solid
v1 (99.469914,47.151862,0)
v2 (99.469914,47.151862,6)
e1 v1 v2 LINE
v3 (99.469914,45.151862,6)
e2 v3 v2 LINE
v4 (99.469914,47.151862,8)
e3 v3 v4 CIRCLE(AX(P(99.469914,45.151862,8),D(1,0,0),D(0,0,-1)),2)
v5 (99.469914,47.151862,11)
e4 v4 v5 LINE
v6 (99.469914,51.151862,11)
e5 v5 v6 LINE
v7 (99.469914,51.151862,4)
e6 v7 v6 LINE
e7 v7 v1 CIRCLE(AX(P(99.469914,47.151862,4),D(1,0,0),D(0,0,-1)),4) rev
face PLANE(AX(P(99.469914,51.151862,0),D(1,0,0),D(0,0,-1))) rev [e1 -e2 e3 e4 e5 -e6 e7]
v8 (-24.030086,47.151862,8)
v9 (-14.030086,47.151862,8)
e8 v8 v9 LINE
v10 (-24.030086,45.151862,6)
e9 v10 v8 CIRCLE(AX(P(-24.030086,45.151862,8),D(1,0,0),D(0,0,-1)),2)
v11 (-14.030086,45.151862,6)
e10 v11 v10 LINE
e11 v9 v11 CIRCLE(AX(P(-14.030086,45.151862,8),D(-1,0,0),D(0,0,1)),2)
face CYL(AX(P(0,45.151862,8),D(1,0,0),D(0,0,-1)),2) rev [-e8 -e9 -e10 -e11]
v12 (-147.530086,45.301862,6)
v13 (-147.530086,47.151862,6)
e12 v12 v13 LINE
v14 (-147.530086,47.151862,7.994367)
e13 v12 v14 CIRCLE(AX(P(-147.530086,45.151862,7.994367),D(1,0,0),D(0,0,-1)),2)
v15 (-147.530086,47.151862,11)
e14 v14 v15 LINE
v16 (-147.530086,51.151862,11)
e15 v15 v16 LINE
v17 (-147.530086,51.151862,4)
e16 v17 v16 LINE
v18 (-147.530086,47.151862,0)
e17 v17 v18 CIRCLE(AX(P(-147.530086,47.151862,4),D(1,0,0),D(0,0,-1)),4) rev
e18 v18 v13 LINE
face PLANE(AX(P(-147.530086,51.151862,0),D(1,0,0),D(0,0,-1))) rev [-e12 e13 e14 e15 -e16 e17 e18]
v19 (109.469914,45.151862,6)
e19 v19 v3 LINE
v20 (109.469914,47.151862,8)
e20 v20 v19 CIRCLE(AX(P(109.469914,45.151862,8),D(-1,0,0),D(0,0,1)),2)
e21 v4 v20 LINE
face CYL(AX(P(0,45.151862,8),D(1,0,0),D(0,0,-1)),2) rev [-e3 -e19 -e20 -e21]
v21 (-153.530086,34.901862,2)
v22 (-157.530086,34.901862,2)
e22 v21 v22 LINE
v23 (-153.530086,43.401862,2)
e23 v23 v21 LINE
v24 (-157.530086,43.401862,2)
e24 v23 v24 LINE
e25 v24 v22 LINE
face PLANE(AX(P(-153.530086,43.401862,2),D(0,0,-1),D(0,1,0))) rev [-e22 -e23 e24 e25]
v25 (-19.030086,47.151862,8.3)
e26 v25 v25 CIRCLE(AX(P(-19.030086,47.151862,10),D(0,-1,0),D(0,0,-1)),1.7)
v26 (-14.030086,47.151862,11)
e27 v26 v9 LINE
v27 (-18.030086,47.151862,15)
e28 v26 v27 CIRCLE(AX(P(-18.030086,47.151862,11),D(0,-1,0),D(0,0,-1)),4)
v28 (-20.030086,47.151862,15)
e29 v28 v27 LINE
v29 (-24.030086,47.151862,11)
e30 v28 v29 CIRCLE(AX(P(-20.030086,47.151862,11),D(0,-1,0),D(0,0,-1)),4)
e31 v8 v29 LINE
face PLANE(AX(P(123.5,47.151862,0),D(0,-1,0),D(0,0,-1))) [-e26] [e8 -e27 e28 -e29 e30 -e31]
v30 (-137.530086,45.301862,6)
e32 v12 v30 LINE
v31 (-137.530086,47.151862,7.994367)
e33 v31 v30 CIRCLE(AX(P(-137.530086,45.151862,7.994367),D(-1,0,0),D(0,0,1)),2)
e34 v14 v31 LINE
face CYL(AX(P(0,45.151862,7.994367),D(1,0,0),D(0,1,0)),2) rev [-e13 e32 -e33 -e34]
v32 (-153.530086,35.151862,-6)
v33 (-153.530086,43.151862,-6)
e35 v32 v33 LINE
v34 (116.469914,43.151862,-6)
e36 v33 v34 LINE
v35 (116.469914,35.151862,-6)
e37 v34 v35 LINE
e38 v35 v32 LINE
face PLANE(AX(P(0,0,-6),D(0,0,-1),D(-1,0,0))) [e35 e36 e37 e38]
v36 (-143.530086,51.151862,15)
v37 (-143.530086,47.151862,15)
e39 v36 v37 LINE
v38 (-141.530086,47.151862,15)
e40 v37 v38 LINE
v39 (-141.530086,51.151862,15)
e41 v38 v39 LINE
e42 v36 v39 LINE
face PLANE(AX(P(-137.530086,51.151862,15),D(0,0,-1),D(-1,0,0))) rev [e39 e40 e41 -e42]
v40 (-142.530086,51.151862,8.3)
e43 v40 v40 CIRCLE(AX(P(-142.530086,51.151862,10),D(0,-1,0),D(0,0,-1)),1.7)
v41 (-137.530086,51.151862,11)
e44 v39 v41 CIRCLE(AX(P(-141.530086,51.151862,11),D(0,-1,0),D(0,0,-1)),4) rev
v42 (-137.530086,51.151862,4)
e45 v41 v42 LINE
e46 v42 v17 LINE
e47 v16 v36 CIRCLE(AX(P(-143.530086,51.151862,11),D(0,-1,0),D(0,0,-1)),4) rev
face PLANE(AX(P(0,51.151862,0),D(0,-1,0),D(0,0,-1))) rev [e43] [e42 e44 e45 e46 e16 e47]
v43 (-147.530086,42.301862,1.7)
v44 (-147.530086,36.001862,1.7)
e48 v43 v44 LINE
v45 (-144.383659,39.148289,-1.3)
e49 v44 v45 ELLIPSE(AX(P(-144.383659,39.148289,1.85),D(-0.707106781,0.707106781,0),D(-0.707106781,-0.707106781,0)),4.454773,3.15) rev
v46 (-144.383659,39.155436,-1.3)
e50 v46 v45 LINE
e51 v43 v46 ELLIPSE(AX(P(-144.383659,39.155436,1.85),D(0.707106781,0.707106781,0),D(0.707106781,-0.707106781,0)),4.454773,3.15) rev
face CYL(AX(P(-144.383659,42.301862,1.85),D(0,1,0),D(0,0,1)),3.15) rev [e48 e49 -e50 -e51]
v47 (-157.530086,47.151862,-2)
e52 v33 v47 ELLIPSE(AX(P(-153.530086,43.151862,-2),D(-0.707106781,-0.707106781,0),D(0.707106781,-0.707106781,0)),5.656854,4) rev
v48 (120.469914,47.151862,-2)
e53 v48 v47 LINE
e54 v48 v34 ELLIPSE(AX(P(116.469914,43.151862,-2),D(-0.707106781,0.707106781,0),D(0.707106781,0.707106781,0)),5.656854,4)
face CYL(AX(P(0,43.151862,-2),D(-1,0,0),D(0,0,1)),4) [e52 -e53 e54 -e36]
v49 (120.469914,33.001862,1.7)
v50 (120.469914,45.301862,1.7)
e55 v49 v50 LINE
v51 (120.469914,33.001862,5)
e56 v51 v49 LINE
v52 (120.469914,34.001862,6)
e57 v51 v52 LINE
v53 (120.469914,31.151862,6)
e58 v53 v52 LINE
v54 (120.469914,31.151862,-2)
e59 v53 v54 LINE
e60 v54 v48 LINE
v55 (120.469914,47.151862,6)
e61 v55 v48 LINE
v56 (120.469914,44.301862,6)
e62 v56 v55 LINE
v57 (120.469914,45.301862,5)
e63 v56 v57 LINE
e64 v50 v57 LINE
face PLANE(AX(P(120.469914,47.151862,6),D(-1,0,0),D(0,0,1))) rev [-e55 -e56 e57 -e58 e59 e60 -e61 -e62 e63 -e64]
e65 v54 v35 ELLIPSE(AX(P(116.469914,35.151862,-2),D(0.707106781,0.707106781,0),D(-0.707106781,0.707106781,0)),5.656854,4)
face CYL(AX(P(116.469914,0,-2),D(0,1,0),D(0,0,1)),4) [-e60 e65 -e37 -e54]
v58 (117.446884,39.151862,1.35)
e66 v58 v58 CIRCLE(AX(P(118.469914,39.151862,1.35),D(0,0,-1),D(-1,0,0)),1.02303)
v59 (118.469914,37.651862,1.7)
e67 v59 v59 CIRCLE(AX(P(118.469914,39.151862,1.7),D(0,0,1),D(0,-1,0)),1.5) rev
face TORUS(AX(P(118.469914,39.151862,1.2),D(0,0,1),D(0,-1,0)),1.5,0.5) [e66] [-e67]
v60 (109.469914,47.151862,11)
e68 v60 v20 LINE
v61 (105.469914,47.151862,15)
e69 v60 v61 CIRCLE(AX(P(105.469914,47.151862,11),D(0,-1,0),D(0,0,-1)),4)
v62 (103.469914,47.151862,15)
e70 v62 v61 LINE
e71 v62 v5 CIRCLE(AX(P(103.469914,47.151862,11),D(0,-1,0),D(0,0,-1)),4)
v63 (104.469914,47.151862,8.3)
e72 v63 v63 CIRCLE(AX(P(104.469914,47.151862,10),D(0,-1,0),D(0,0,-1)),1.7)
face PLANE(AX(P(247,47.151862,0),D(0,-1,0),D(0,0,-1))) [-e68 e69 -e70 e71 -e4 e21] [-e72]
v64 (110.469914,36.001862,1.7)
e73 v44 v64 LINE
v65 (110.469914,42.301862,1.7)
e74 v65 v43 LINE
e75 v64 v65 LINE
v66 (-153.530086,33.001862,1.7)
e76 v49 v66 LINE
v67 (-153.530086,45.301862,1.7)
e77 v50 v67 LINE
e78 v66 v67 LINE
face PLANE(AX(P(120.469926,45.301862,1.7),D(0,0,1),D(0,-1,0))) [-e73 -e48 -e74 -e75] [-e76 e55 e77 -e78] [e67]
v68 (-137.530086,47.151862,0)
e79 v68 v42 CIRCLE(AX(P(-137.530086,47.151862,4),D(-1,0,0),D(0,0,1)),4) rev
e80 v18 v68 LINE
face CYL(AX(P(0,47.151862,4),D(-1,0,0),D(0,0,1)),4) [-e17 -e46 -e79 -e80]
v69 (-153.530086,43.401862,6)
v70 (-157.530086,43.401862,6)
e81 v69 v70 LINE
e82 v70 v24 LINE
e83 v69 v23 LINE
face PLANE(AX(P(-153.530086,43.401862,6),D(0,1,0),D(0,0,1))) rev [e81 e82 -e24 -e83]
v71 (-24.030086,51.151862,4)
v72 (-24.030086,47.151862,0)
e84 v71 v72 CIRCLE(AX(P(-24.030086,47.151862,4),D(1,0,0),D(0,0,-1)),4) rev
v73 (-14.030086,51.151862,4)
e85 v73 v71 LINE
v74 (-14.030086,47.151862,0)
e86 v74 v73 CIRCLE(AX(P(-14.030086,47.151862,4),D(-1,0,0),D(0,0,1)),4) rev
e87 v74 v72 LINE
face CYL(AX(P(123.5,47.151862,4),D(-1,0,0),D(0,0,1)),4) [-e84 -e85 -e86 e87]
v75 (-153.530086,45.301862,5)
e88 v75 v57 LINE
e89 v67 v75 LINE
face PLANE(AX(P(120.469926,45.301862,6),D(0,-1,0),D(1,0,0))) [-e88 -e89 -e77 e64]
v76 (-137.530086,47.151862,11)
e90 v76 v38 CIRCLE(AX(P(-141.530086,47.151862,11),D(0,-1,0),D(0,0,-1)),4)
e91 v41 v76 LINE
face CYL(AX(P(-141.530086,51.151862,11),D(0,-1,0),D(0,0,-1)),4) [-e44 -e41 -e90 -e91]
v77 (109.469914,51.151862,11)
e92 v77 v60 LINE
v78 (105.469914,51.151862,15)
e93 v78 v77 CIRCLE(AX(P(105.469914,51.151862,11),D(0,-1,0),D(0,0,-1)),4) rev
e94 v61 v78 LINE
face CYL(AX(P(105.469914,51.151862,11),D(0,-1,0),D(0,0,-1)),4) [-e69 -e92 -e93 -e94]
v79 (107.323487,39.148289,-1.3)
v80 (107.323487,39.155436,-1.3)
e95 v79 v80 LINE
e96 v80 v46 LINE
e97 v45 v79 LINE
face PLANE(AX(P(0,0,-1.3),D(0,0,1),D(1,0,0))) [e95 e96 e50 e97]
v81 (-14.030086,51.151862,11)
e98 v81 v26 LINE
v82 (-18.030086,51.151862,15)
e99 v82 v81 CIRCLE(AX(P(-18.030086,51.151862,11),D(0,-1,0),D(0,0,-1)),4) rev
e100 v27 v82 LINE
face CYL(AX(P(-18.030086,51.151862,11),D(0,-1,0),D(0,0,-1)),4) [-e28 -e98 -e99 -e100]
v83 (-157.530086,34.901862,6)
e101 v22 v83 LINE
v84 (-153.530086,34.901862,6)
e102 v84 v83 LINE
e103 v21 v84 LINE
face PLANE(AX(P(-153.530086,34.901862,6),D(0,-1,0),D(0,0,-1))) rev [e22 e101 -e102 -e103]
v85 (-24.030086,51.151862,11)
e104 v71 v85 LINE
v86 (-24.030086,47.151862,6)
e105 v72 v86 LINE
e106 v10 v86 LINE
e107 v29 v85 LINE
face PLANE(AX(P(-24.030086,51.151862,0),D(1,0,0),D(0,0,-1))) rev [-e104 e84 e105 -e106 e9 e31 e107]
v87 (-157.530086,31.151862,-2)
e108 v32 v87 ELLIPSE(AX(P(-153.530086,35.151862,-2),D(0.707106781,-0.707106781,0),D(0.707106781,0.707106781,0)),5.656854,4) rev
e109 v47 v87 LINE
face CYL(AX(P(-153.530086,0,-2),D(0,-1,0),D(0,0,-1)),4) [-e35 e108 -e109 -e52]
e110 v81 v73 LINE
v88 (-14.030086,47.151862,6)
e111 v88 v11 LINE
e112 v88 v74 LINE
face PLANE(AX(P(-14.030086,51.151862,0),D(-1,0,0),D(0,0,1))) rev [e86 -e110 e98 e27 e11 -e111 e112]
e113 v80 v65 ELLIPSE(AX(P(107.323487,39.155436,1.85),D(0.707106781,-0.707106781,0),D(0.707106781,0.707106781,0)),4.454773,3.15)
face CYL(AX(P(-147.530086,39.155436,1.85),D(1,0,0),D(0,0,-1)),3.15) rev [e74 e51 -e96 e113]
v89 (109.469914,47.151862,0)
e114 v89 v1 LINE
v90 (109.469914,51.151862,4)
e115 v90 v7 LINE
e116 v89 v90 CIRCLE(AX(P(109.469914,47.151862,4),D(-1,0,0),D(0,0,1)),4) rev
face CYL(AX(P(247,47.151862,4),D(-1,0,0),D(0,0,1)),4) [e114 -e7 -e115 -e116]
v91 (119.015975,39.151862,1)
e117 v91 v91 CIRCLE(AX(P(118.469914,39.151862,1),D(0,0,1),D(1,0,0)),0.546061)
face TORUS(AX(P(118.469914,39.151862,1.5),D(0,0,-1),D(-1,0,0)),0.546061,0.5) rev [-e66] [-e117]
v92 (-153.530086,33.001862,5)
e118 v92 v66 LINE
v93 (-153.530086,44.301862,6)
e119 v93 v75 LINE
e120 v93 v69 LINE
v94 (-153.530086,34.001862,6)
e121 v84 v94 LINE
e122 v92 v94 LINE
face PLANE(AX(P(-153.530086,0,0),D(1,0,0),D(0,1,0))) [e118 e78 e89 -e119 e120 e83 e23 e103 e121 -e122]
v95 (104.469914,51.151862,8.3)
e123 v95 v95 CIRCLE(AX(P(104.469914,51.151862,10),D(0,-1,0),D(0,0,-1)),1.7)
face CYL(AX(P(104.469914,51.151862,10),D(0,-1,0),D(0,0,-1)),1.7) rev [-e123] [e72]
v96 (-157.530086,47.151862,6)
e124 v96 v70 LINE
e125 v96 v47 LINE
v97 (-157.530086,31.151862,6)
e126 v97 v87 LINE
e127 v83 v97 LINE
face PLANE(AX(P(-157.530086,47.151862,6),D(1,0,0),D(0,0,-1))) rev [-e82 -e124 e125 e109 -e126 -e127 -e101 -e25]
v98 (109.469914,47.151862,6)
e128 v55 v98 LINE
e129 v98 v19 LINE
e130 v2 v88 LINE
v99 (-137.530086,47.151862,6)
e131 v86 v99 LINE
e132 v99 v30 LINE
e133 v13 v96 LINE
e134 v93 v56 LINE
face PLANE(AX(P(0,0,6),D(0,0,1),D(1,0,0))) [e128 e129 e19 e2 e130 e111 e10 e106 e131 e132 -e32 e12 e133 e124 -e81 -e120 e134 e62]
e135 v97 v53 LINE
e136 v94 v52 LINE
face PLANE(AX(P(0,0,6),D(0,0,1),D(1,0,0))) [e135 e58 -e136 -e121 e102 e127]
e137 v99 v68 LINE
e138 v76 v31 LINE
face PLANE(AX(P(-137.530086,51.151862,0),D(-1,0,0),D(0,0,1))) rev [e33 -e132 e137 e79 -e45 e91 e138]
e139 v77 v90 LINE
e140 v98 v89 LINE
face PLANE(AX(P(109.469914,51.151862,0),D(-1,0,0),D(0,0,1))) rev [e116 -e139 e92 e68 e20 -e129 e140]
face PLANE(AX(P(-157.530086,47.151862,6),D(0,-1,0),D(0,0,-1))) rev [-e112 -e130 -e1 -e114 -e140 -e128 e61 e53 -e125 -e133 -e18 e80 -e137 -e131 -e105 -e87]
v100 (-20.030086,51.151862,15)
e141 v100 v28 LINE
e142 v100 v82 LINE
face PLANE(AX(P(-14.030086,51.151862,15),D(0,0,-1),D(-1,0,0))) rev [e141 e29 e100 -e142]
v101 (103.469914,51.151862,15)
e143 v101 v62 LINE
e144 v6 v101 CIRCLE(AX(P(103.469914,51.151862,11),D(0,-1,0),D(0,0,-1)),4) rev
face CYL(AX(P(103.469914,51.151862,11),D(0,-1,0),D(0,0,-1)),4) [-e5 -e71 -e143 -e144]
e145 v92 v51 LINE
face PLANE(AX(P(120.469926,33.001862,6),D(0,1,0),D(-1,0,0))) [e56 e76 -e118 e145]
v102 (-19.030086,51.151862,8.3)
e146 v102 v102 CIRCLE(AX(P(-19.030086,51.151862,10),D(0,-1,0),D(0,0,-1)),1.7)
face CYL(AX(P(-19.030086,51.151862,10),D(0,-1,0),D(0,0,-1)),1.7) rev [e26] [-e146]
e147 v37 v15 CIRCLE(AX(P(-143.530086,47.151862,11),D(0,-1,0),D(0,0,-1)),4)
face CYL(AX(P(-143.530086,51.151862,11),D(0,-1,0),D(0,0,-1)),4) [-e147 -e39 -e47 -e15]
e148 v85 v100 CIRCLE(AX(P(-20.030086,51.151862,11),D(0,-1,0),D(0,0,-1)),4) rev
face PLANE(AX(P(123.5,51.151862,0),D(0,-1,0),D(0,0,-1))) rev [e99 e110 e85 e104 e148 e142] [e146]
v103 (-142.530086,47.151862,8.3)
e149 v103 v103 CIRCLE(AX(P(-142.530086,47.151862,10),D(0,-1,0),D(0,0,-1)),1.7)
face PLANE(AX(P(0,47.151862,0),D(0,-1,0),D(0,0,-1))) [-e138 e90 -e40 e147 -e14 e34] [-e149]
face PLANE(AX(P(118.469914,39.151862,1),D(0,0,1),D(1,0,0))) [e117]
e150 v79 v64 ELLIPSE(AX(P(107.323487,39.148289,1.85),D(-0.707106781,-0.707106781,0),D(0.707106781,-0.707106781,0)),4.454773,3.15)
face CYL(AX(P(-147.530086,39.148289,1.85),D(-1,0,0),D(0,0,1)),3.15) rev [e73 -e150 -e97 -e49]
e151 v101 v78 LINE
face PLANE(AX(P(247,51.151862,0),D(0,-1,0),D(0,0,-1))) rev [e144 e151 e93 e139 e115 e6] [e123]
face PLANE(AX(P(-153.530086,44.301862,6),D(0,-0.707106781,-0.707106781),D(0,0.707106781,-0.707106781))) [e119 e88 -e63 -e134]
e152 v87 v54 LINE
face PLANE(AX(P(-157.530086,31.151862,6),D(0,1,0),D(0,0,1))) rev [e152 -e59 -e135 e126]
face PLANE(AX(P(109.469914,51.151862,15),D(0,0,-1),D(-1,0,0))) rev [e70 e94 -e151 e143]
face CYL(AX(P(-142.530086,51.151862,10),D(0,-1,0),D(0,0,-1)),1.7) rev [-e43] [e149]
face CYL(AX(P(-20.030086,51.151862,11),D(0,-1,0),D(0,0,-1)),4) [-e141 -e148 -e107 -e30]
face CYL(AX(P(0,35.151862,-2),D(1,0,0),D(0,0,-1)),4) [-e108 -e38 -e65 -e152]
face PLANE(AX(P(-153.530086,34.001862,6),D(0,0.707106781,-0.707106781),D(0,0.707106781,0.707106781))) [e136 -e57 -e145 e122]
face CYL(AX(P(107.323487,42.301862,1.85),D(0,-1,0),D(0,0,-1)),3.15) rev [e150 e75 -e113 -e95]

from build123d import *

# Parameters (mm, degrees)
SKETCH1_W               = 278
SKETCH1_H               = 16
BOSS_EXTRUDE1_DEPTH     = 6
CUT_EXTRUDE1_DEPTH      = 283.034214474
CUT_EXTRUDE1_DEPTH_BACK = 274
SKETCH3_W               = 4.3
SKETCH3_H               = 12.3
SKETCH13_W              = 10
SKETCH13_H              = 15
BOSS_EXTRUDE5_DEPTH     = 4
FILLET10_R              = 4
SKETCH14_R              = 1.7
CUT_EXTRUDE5_DEPTH      = 4
FILLET11_R              = 4
FILLET12_R              = 4
FILLET22_R              = 2
SKETCH17_W              = 278
SKETCH17_H              = 16
BOSS_EXTRUDE6_DEPTH     = 6
FILLET25_R              = 4
SKETCH18_R              = 1
CUT_EXTRUDE6_DEPTH      = 0.7
FILLET26_R              = 0.5
FILLET27_R              = 0.5
SKETCH21_W              = 4
SKETCH21_H              = 8.5
CUT_EXTRUDE10_DEPTH     = 4
BOSS_EXTRUDE9_DEPTH     = 274
SKETCH27_W              = 258
SKETCH27_H              = 6.3
CUT_EXTRUDE11_DEPTH     = 3
FILLET30_R              = 3.15
LPATTERN2_START         = 47.151862464
LPATTERN2_OUTLINE_R     = 1.7
LPATTERN2_DEPTH         = 4
LPATTERN2_START_2       = -24.03008596
LPATTERN2_2_DEPTH       = 10
LPATTERN2_START_3       = 99.46991404
LPATTERN2_3_DEPTH       = 10


with BuildPart() as part:
    # Sketch1 → Boss-Extrude1 (new body)
    with BuildSketch(Plane.XY):
        with Locations((-18.53008596, 39.151862464)):
            Rectangle(SKETCH1_W, SKETCH1_H)
    extrude(amount=BOSS_EXTRUDE1_DEPTH)

    # Sketch3 → Cut-Extrude1 (cut, two sides: drawn at the far end of the back side and taken through both)
    with BuildSketch(Plane(origin=(120.46991404, 0, 0), x_dir=(0, 0, -1), z_dir=(1, 0, 0)).offset(-CUT_EXTRUDE1_DEPTH_BACK)):
        with Locations((-3.85, 39.151862464)):
            Rectangle(SKETCH3_W, SKETCH3_H)
    extrude(amount=CUT_EXTRUDE1_DEPTH + CUT_EXTRUDE1_DEPTH_BACK, mode=Mode.SUBTRACT)

    # Sketch13 → Boss-Extrude5 (add)
    with BuildSketch(Plane(origin=(0, 47.151862464, 0), x_dir=(1, 0, 0), z_dir=(0, 1, 0))):
        with Locations((-142.53008596, -7.5)):
            Rectangle(SKETCH13_W, SKETCH13_H)
    extrude(amount=BOSS_EXTRUDE5_DEPTH)

    # Fillet10
    fillet10_edges = [part.edges().sort_by_distance(p)[0] for p in [
        (-142.53008596, 51.151862464, 0),
    ]]
    fillet(fillet10_edges, radius=FILLET10_R)

    # Sketch14 → Cut-Extrude5 (cut)
    with BuildSketch(Plane.XZ.offset(-47.151862464)):
        with Locations(Location((-142.53008596, 10, 0), (0, 0, 270))):
            Circle(SKETCH14_R)
    extrude(amount=-CUT_EXTRUDE5_DEPTH, mode=Mode.SUBTRACT)

    # Fillet11
    fillet11_edges = [part.edges().sort_by_distance(p)[0] for p in [
        (-137.53008596, 49.151862464, 15),
    ]]
    fillet(fillet11_edges, radius=FILLET11_R)

    # Fillet12
    fillet12_edges = [part.edges().sort_by_distance(p)[0] for p in [
        (-147.53008596, 49.151862464, 15),
    ]]
    fillet(fillet12_edges, radius=FILLET12_R)

    # Fillet22
    # the kernel refuses this fillet: 2 mm, written as the material it adds along each edge
    with BuildSketch(Plane(origin=(-147.53008596, 47.151862464, 6), x_dir=(0, 0, 1), z_dir=(1, 0, 0))) as fillet22_piece_1:
        with BuildLine():
            CenterArc((1.994367068, 2), FILLET22_R, 184.301222305, 85.698777695)
            Line((0, 1.85), (0, 0))
            Line((0, 0), (1.994367068, 0))
        make_face()
    extrude(amount=10)

    # Sketch17 → Boss-Extrude6 (add)
    with BuildSketch(Plane(origin=(0, 0, 0), x_dir=(-1, 0, 0), z_dir=(0, 0, -1))):
        with Locations((18.53008596, 39.151862464)):
            Rectangle(SKETCH17_W, SKETCH17_H)
    extrude(amount=BOSS_EXTRUDE6_DEPTH)

    # Fillet25
    fillet25_edges = [part.edges().sort_by_distance(p)[0] for p in [
        (120.46991404, 39.151862464, -6),
        (-18.53008596, 31.151862464, -6),
        (-157.53008596, 39.151862464, -6),
        (-18.53008596, 47.151862464, -6),
    ]]
    fillet(fillet25_edges, radius=FILLET25_R)

    # Sketch18 → Cut-Extrude6 (cut)
    with BuildSketch(Plane.XY.offset(1.7)):
        with Locations((118.46991404, 39.151862464)):
            Circle(SKETCH18_R)
    extrude(amount=-CUT_EXTRUDE6_DEPTH, mode=Mode.SUBTRACT)

    # Fillet26
    fillet26_edges = [part.edges().sort_by_distance(p)[0] for p in [
        (117.46991404, 39.151862464, 1.7),
    ]]
    fillet(fillet26_edges, radius=FILLET26_R)

    # Fillet27
    fillet27_edges = [part.edges().sort_by_distance(p)[0] for p in [
        (117.46991404, 39.151862464, 1),
    ]]
    fillet(fillet27_edges, radius=FILLET27_R)

    # Sketch21 → Cut-Extrude10 (cut)
    with BuildSketch(Plane.ZY.offset(157.53008596)):
        with Locations((4, 39.151862464)):
            Rectangle(SKETCH21_W, SKETCH21_H)
    extrude(amount=-CUT_EXTRUDE10_DEPTH, mode=Mode.SUBTRACT)

    # Sketch26 → Boss-Extrude9 (add)
    with BuildSketch(Plane(origin=(120.46991404, 0, 0), x_dir=(0, 0, -1), z_dir=(1, 0, 0))):
        Polygon((-6, 45.301862464), (-6, 44.301862464), (-5, 45.301862464), align=None)
        Polygon((-6, 33.001862464), (-6, 34.001862464), (-5, 33.001862464), align=None)
    extrude(amount=-BOSS_EXTRUDE9_DEPTH)

    # Sketch27 → Cut-Extrude11 (cut)
    with BuildSketch(Plane.XY.offset(1.7)):
        with Locations((-18.53008596, 39.151862464)):
            Rectangle(SKETCH27_W, SKETCH27_H)
    extrude(amount=-CUT_EXTRUDE11_DEPTH, mode=Mode.SUBTRACT)

    # Fillet30
    # the kernel refuses this fillet: 3.15 mm, written as the material it adds along each edge
    with BuildSketch(Plane(origin=(-155.396152321, 42.301862464, -1.3), x_dir=(0, 0, 1), z_dir=(1, 0, 0)), Plane(origin=(118.335980401, 36.001862464, -1.3), x_dir=(0, 0, 1), z_dir=(-1, 0, 0))) as fillet30_piece_1:
        with BuildLine():
            CenterArc((3.15, 3.146426545), FILLET30_R, 180, 87.270597363)
            Line((0, 3.146426545), (0, 0))
            Line((0, 0), (3, 0))
        make_face()
    extrude(amount=273.732132723)
    with BuildSketch(Plane(origin=(110.46991404, 50.167928825, -1.3), x_dir=(0, 0, 1), z_dir=(0, -1, 0))) as fillet30_piece_2_section:
        with BuildLine():
            CenterArc((3.15, 3.146426545), FILLET30_R, 180, 87.270597363)
            Line((0, 3.146426545), (0, 0))
            Line((0, 0), (3, 0))
        make_face()
    fillet30_piece_2 = extrude(amount=22.032132723, mode=Mode.PRIVATE)
    fillet30_piece_2 = split(fillet30_piece_2, bisect_by=Plane(origin=(110.46991404, 31.151862464, -1.3), z_dir=(0, 1, 0)), keep=Keep.TOP, mode=Mode.PRIVATE)
    fillet30_piece_2 = split(fillet30_piece_2, bisect_by=Plane(origin=(110.46991404, 47.151862464, -1.3), z_dir=(0, -1, 0)), keep=Keep.TOP, mode=Mode.PRIVATE)
    add(fillet30_piece_2)
    with BuildSketch(Plane(origin=(-147.53008596, 28.135796103, -1.3), x_dir=(0, 0, 1), z_dir=(0, 1, 0))) as fillet30_piece_3_section:
        with BuildLine():
            CenterArc((3.15, 3.146426545), FILLET30_R, 180, 87.270597363)
            Line((0, 3.146426545), (0, 0))
            Line((0, 0), (3, 0))
        make_face()
    fillet30_piece_3 = extrude(amount=22.032132723, mode=Mode.PRIVATE)
    fillet30_piece_3 = split(fillet30_piece_3, bisect_by=Plane(origin=(-147.53008596, 31.151862464, -1.3), z_dir=(0, 1, 0)), keep=Keep.TOP, mode=Mode.PRIVATE)
    fillet30_piece_3 = split(fillet30_piece_3, bisect_by=Plane(origin=(-147.53008596, 47.151862464, -1.3), z_dir=(0, -1, 0)), keep=Keep.TOP, mode=Mode.PRIVATE)
    add(fillet30_piece_3)

    # LPattern2: read off the stored shape, not the designer's step
    # LPattern2 outline → LPattern2 (add)
    # profile 1 of 2: a face of its own
    with BuildSketch(Plane(origin=(0, 0, 0), x_dir=(1, 0, 0), z_dir=(0, 1, 0)).offset(LPATTERN2_START)):
        with BuildLine():
            Line((-14.03008596, -11), (-14.03008596, -6))
            Line((-14.03008596, -6), (-24.03008596, -6))
            Line((-24.03008596, -6), (-24.03008596, -11))
            ThreePointArc((-24.03008596, -11), (-22.858513085, -13.828427125), (-20.03008596, -15))
            Line((-20.03008596, -15), (-18.03008596, -15))
            ThreePointArc((-18.03008596, -15), (-15.201658835, -13.828427125), (-14.03008596, -11))
        make_face()
        with Locations((-19.03008596, -10)):
            Circle(LPATTERN2_OUTLINE_R, mode=Mode.SUBTRACT)
    # profile 2 of 2: a face of its own
    with BuildSketch(Plane(origin=(0, 0, 0), x_dir=(1, 0, 0), z_dir=(0, 1, 0)).offset(LPATTERN2_START)):
        with BuildLine():
            Line((103.46991404, -15), (105.46991404, -15))
            ThreePointArc((105.46991404, -15), (108.298341165, -13.828427125), (109.46991404, -11))
            Line((109.46991404, -11), (109.46991404, -6))
            Line((109.46991404, -6), (99.46991404, -6))
            Line((99.46991404, -6), (99.46991404, -11))
            ThreePointArc((99.46991404, -11), (100.641486915, -13.828427125), (103.46991404, -15))
        make_face()
        with Locations((104.46991404, -10)):
            Circle(LPATTERN2_OUTLINE_R, mode=Mode.SUBTRACT)
    extrude(amount=LPATTERN2_DEPTH)

    # LPattern2 2 outline → LPattern2 2 (add)
    with BuildSketch(Plane.YZ.offset(LPATTERN2_START_2)):
        with BuildLine():
            Line((45.151862464, 6), (47.151862464, 6))
            Line((47.151862464, 6), (47.151862464, 8))
            ThreePointArc((47.151862464, 8), (46.566076026, 6.585786437), (45.151862464, 6))
        make_face()
        with BuildLine():
            Line((51.151862464, 4), (51.151862464, 6))
            Line((51.151862464, 6), (47.151862464, 6))
            Line((47.151862464, 6), (47.151862464, 0))
            ThreePointArc((47.151862464, 0), (49.980289589, 1.171572875), (51.151862464, 4))
        make_face()
    extrude(amount=LPATTERN2_2_DEPTH)

    # LPattern2 3 outline → LPattern2 3 (add)
    with BuildSketch(Plane.YZ.offset(LPATTERN2_START_3)):
        with BuildLine():
            Line((45.151862464, 6), (47.151862464, 6))
            Line((47.151862464, 6), (47.151862464, 8))
            ThreePointArc((47.151862464, 8), (46.566076026, 6.585786437), (45.151862464, 6))
        make_face()
        with BuildLine():
            Line((51.151862464, 4), (51.151862464, 6))
            Line((51.151862464, 6), (47.151862464, 6))
            Line((47.151862464, 6), (47.151862464, 0))
            ThreePointArc((47.151862464, 0), (49.980289589, 1.171572875), (51.151862464, 4))
        make_face()
    extrude(amount=LPATTERN2_3_DEPTH)


solid = part.part
